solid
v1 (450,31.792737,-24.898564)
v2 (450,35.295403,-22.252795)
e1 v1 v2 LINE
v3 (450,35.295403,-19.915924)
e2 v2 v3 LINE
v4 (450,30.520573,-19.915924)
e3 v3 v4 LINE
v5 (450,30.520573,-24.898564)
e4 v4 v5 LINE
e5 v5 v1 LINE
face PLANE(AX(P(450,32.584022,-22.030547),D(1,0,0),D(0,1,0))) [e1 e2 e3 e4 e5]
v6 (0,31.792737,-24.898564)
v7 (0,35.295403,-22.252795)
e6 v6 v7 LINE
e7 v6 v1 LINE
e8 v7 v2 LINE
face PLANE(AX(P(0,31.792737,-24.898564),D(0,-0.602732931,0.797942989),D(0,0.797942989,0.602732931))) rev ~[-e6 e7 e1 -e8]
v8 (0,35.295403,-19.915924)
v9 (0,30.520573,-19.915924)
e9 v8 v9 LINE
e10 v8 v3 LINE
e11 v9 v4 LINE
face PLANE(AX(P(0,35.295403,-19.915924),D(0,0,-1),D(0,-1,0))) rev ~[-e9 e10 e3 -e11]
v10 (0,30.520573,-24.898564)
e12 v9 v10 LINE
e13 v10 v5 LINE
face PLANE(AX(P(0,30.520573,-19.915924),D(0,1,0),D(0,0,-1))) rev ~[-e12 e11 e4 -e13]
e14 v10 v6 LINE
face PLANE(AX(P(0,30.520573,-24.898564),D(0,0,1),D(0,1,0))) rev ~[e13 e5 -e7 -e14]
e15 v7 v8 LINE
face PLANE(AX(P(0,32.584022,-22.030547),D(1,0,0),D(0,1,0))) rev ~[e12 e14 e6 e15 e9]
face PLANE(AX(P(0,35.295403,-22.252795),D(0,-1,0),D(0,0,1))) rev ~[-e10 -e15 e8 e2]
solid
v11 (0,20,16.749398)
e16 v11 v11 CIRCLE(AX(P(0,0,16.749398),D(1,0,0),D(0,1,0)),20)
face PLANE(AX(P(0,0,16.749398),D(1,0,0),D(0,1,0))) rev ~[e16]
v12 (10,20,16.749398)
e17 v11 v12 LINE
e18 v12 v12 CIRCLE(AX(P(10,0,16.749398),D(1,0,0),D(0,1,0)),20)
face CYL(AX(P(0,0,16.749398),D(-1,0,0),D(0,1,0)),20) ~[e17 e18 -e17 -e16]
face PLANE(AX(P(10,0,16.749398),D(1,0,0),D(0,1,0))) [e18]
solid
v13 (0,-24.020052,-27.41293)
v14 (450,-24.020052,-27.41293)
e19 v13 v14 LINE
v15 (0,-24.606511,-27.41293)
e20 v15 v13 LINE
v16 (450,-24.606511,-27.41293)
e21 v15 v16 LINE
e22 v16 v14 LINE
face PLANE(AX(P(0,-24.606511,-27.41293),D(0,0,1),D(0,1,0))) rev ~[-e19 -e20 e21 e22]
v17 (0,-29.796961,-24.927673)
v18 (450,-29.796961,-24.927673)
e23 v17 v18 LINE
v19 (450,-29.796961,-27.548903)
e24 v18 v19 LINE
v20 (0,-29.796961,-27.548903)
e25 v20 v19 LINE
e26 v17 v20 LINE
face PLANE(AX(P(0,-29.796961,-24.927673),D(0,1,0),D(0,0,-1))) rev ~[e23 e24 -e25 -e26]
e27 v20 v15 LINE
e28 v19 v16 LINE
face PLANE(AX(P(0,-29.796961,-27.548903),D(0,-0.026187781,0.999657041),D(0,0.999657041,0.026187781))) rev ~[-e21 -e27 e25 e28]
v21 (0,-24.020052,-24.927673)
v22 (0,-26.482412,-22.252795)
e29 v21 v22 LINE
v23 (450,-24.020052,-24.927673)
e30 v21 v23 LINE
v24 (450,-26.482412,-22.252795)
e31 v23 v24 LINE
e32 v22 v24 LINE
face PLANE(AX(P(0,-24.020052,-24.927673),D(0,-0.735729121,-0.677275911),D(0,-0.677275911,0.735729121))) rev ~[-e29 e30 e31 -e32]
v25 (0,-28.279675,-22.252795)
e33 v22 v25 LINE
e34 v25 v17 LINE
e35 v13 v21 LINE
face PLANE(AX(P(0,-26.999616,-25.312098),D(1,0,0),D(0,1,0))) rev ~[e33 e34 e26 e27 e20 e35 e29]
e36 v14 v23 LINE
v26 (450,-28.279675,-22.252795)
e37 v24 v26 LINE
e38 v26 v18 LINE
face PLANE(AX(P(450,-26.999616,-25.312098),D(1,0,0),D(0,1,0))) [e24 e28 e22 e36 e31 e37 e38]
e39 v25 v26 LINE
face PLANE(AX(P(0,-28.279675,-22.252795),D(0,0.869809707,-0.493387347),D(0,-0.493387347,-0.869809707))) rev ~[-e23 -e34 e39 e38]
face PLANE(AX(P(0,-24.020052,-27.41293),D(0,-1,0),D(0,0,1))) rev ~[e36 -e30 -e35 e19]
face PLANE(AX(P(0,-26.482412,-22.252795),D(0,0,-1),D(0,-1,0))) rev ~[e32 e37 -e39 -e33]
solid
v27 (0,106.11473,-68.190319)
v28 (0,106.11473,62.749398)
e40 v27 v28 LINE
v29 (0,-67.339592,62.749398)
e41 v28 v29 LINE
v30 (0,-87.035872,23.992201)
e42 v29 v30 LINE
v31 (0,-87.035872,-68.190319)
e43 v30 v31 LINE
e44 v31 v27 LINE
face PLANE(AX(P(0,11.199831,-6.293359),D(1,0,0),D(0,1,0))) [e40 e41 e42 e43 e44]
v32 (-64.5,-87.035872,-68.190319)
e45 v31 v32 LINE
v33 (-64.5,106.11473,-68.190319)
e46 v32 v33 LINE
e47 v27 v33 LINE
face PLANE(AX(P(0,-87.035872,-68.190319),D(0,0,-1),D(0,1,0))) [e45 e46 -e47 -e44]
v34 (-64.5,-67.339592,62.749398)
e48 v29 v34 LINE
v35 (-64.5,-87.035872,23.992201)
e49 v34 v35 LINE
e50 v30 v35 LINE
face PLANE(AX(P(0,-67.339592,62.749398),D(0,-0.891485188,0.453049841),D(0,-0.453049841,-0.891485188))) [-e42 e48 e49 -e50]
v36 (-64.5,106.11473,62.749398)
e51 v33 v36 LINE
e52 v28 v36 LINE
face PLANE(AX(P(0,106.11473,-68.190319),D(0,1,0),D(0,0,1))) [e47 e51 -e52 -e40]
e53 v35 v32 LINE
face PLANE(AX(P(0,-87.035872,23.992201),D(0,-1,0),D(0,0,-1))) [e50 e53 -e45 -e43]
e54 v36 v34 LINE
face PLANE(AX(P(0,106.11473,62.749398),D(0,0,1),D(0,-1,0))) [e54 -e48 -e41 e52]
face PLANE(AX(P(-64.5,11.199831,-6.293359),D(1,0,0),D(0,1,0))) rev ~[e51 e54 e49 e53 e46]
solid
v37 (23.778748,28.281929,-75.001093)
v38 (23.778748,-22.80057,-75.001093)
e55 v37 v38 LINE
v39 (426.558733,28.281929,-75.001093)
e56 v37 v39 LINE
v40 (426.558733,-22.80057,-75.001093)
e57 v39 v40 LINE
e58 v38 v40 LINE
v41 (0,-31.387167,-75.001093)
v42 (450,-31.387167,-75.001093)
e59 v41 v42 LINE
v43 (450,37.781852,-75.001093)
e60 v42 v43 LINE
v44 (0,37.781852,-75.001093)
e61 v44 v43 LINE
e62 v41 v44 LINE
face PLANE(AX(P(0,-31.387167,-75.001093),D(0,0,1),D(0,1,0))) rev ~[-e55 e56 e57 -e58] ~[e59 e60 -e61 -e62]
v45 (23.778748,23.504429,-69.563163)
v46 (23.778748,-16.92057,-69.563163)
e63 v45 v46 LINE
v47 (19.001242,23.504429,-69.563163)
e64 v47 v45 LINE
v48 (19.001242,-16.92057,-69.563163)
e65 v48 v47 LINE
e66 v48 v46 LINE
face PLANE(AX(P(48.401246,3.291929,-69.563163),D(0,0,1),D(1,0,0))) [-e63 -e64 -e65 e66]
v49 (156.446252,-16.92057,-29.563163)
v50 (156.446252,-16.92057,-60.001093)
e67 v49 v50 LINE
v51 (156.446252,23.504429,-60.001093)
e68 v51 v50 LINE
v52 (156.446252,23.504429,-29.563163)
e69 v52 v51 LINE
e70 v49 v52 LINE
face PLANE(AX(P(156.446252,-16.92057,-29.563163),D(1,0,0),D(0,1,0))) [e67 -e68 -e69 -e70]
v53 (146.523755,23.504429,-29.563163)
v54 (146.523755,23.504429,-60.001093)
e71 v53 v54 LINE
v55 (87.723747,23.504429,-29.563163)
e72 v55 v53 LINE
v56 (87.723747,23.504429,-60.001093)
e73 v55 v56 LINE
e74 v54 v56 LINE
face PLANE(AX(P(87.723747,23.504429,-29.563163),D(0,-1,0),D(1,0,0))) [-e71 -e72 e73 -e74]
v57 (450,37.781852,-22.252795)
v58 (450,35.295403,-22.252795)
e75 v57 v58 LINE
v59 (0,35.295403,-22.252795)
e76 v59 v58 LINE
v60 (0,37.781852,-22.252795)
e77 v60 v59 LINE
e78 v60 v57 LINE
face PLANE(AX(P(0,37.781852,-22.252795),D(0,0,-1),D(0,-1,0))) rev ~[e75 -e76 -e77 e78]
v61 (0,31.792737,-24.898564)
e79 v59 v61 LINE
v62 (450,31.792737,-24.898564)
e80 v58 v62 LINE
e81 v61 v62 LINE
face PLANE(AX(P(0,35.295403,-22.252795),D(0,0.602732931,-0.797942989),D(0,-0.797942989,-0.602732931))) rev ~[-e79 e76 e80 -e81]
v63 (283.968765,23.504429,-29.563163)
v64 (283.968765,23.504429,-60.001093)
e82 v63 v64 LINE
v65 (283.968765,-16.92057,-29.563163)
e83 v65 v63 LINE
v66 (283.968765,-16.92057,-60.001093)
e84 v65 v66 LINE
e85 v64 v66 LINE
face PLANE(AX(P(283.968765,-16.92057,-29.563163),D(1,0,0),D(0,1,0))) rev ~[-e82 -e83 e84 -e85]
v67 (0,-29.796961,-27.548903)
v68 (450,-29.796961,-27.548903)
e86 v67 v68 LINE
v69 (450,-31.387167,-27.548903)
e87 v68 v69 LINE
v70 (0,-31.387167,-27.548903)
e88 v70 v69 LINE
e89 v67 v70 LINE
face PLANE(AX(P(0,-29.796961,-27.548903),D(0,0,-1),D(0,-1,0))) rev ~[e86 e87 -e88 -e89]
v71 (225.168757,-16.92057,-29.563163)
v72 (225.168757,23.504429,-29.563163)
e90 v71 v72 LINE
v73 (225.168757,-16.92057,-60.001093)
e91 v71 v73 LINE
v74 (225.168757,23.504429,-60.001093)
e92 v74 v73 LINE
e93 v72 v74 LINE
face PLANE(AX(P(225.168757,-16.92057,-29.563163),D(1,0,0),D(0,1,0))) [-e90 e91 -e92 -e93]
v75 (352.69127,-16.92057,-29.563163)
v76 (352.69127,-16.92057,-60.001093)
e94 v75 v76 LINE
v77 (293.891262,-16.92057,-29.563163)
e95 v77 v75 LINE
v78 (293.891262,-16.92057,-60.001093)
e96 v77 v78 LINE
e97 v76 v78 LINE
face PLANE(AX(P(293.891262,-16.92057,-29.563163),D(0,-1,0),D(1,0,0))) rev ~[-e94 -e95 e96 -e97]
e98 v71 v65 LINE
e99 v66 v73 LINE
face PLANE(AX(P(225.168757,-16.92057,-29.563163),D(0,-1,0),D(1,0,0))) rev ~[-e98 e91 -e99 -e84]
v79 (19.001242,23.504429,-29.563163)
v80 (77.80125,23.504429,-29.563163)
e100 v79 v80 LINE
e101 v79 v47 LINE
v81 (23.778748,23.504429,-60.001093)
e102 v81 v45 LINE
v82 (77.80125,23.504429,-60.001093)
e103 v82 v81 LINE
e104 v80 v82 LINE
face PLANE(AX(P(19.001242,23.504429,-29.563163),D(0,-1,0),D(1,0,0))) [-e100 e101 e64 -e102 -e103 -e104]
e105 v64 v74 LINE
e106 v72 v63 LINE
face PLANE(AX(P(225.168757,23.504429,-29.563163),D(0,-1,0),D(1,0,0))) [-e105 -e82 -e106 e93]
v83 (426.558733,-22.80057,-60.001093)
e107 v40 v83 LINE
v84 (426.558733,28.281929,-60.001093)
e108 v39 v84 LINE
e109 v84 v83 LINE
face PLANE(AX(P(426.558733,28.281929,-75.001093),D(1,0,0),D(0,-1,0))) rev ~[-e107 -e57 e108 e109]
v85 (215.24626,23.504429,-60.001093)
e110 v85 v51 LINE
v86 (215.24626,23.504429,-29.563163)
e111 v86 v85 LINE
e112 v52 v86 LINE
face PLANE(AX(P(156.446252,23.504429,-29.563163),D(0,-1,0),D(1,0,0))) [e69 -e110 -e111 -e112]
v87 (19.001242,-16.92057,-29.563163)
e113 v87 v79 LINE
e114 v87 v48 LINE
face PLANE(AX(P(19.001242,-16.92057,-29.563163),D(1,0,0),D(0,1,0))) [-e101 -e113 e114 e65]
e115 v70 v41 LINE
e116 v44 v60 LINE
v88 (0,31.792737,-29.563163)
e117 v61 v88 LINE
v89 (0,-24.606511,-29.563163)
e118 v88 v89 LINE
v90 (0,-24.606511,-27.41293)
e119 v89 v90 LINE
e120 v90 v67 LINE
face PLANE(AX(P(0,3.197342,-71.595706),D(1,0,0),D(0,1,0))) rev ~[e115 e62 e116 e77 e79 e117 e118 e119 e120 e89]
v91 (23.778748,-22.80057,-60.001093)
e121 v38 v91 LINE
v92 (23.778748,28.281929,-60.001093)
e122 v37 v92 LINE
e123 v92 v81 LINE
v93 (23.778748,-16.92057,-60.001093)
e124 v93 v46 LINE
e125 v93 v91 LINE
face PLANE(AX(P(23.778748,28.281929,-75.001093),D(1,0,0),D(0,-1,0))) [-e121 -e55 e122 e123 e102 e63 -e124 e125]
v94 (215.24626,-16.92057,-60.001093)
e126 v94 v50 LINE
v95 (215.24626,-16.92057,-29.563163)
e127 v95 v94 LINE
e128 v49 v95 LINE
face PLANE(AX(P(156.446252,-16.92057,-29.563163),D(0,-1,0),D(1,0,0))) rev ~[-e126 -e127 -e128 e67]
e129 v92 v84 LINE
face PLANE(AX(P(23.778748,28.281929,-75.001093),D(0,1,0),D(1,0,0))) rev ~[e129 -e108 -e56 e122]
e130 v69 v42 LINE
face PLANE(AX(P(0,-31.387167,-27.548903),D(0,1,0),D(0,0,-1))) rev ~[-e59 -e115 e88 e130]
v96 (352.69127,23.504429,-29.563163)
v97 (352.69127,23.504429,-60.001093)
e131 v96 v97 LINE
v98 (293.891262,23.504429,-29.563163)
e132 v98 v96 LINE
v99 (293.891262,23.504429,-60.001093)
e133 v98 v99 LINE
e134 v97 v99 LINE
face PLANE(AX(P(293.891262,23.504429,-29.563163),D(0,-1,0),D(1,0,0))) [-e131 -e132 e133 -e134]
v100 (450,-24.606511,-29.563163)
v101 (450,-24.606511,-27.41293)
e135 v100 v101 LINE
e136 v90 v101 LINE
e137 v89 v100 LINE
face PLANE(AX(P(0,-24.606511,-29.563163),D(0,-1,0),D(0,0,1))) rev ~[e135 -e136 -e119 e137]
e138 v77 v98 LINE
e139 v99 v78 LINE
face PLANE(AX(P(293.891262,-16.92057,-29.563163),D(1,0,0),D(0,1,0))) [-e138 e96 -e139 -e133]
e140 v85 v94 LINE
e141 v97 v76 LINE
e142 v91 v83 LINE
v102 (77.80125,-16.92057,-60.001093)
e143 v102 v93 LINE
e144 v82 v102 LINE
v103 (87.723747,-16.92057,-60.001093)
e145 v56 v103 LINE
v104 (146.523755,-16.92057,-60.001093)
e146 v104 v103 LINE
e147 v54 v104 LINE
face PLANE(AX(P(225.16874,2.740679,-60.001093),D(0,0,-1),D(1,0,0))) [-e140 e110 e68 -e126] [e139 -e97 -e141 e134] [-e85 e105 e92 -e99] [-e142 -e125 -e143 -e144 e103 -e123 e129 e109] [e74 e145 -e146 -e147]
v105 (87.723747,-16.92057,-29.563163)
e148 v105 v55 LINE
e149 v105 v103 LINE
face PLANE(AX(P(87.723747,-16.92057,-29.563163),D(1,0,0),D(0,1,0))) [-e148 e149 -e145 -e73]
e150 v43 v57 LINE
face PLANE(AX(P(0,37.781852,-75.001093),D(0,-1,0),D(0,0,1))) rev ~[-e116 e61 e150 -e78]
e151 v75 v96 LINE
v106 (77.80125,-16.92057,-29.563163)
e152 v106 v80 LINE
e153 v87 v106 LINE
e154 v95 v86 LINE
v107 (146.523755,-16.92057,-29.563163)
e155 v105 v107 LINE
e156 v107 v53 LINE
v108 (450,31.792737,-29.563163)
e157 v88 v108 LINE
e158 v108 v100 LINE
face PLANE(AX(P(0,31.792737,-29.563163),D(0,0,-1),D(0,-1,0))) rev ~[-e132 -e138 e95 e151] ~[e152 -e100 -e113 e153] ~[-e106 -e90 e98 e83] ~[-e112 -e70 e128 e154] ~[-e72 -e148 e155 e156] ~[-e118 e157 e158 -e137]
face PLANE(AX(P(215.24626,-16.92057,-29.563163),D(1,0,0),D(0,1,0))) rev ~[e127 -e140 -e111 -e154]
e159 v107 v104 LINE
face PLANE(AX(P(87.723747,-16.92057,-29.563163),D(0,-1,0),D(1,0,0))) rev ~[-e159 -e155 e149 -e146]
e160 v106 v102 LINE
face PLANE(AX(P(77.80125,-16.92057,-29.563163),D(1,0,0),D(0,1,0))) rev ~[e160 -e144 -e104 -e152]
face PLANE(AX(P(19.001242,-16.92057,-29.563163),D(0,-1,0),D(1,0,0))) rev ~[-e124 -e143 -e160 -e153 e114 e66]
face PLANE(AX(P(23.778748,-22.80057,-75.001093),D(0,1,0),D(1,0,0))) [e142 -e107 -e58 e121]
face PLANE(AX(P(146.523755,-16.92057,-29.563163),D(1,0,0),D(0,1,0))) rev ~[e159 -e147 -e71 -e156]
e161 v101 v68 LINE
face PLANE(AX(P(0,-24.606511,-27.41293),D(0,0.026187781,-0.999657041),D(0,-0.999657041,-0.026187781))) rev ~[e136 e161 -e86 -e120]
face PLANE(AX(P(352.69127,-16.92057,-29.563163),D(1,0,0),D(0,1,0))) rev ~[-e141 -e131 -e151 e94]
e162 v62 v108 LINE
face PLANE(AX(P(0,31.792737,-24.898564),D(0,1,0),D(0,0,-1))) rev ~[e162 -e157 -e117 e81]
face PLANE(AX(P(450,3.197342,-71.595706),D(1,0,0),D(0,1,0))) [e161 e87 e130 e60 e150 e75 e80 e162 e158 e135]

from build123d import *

# Parameters (mm, degrees)
F0_R     = 20
F1_DEPTH = 64.5
F0_W     = 69.1690184176
F0_H     = 6.8107743772
F2_DEPTH = 450
F3_W     = 402.7799852192
F3_H     = 51.0824993253
F4_DEPTH = 15
F5_W     = 58.800008148
F5_H     = 40.4249988496
F6_DEPTH = 40
F7_DEPTH = 450
F8_DEPTH = 10


# Not quite as in the source:
# - a feature names something its author has since deleted; it is built from what else it names


with BuildPart() as f1:
    # F0 (on Right) → F1 (new body)
    with BuildSketch(Plane.YZ):
        Polygon((-87.0358720422, 23.9922005967), (-87.0358720422, -68.190318747), (-31.3871668349, -68.190318747), (-31.3871668349, -27.5489028139), (-29.7969614784, -27.5489028139), (-29.7969614784, -24.9276731835), (-28.2796746202, -22.2527954323), (-26.482412375, -22.2527954323), (-24.0200519564, -24.9276731835), (-24.0200519564, -27.412929792), (-24.6065106683, -27.412929792), (-24.6065106683, -29.5631634037), (31.7927369408, -29.5631634037), (31.7927369408, -24.8985635082), (30.5205726556, -24.8985635082), (30.5205726556, -19.9159244041), (35.2954028477, -19.9159244041), (35.2954028477, -22.2527954323), (37.7818515827, -22.2527954323), (37.7818515827, -68.190318747), (106.1147302389, -68.190318747), (106.1147302389, 62.7493981556), (-67.339591682, 62.7493981556), align=None)
        with Locations((0, 16.7493981556)):
            Circle(F0_R, mode=Mode.SUBTRACT)
        Polygon((-31.3871668349, -27.5489028139), (-31.3871668349, -68.190318747), (37.7818515827, -68.190318747), (37.7818515827, -22.2527954323), (35.2954028477, -22.2527954323), (31.7927369408, -24.8985635082), (31.7927369408, -29.5631634037), (-24.6065106683, -29.5631634037), (-24.6065106683, -27.412929792), (-29.7969614784, -27.5489028139), align=None)
        with Locations((0, 16.7493981556)):
            Circle(F0_R)
        Polygon((-29.7969614784, -24.9276731835), (-29.7969614784, -27.5489028139), (-24.6065106683, -27.412929792), (-24.0200519564, -27.412929792), (-24.0200519564, -24.9276731835), (-26.482412375, -22.2527954323), (-28.2796746202, -22.2527954323), align=None)
        Polygon((31.7927369408, -24.8985635082), (35.2954028477, -22.2527954323), (35.2954028477, -19.9159244041), (30.5205726556, -19.9159244041), (30.5205726556, -24.8985635082), align=None)
    extrude(amount=-F1_DEPTH)


with BuildPart() as f2:
    # F0 (on Right) → F2 (new body)
    with BuildSketch(Plane.YZ):
        with Locations((3.1973423739, -71.5957059356)):
            Rectangle(F0_W, F0_H)
        Polygon((-31.3871668349, -27.5489028139), (-31.3871668349, -68.190318747), (37.7818515827, -68.190318747), (37.7818515827, -22.2527954323), (35.2954028477, -22.2527954323), (31.7927369408, -24.8985635082), (31.7927369408, -29.5631634037), (-24.6065106683, -29.5631634037), (-24.6065106683, -27.412929792), (-29.7969614784, -27.5489028139), align=None)
    extrude(amount=F2_DEPTH)

    # F3 (on face) → F4 (cut)
    with BuildSketch(Plane(origin=(0, 0, -75.0010931242), x_dir=(1, 0, 0), z_dir=(0, 0, -1))):
        with Locations((225.1687403768, -2.7406793088)):
            Rectangle(F3_W, F3_H)
    extrude(amount=-F4_DEPTH, mode=Mode.SUBTRACT)

    # F5 (on face) → F6 (cut)
    with BuildSketch(Plane.XY.offset(-29.5631634037)):
        with Locations((48.4012458473, 3.2919291407)):
            Rectangle(F5_W, F5_H)
        with Locations((323.291266337, 3.2919291407)):
            Rectangle(F5_W, F5_H)
        with Locations((117.1237509698, 3.2919291407)):
            Rectangle(F5_W, F5_H)
        with Locations((185.8462560922, 3.2919291407)):
            Rectangle(F5_W, F5_H)
        with Locations((254.5687612146, 3.2919291407)):
            Rectangle(F5_W, F5_H)
    extrude(amount=-F6_DEPTH, mode=Mode.SUBTRACT)


with BuildPart() as f7:
    # F0 (on Right) → F7 (new body)
    with BuildSketch(Plane.YZ):
        Polygon((-29.7969614784, -24.9276731835), (-29.7969614784, -27.5489028139), (-24.6065106683, -27.412929792), (-24.0200519564, -27.412929792), (-24.0200519564, -24.9276731835), (-26.482412375, -22.2527954323), (-28.2796746202, -22.2527954323), align=None)
    extrude(amount=F7_DEPTH)


with BuildPart() as f7b:
    # F0 (on Right) → F7, piece 2 (new body)
    with BuildSketch(Plane.YZ):
        Polygon((31.7927369408, -24.8985635082), (35.2954028477, -22.2527954323), (35.2954028477, -19.9159244041), (30.5205726556, -19.9159244041), (30.5205726556, -24.8985635082), align=None)
    extrude(amount=F7_DEPTH)


with BuildPart() as f8:
    # F0 (on Right) → F8 (new body)
    with BuildSketch(Plane.YZ):
        with Locations((0, 16.7493981556)):
            Circle(F0_R)
    extrude(amount=F8_DEPTH)


solid = Compound([f1.part, f2.part, f7.part, f7b.part, f8.part])
